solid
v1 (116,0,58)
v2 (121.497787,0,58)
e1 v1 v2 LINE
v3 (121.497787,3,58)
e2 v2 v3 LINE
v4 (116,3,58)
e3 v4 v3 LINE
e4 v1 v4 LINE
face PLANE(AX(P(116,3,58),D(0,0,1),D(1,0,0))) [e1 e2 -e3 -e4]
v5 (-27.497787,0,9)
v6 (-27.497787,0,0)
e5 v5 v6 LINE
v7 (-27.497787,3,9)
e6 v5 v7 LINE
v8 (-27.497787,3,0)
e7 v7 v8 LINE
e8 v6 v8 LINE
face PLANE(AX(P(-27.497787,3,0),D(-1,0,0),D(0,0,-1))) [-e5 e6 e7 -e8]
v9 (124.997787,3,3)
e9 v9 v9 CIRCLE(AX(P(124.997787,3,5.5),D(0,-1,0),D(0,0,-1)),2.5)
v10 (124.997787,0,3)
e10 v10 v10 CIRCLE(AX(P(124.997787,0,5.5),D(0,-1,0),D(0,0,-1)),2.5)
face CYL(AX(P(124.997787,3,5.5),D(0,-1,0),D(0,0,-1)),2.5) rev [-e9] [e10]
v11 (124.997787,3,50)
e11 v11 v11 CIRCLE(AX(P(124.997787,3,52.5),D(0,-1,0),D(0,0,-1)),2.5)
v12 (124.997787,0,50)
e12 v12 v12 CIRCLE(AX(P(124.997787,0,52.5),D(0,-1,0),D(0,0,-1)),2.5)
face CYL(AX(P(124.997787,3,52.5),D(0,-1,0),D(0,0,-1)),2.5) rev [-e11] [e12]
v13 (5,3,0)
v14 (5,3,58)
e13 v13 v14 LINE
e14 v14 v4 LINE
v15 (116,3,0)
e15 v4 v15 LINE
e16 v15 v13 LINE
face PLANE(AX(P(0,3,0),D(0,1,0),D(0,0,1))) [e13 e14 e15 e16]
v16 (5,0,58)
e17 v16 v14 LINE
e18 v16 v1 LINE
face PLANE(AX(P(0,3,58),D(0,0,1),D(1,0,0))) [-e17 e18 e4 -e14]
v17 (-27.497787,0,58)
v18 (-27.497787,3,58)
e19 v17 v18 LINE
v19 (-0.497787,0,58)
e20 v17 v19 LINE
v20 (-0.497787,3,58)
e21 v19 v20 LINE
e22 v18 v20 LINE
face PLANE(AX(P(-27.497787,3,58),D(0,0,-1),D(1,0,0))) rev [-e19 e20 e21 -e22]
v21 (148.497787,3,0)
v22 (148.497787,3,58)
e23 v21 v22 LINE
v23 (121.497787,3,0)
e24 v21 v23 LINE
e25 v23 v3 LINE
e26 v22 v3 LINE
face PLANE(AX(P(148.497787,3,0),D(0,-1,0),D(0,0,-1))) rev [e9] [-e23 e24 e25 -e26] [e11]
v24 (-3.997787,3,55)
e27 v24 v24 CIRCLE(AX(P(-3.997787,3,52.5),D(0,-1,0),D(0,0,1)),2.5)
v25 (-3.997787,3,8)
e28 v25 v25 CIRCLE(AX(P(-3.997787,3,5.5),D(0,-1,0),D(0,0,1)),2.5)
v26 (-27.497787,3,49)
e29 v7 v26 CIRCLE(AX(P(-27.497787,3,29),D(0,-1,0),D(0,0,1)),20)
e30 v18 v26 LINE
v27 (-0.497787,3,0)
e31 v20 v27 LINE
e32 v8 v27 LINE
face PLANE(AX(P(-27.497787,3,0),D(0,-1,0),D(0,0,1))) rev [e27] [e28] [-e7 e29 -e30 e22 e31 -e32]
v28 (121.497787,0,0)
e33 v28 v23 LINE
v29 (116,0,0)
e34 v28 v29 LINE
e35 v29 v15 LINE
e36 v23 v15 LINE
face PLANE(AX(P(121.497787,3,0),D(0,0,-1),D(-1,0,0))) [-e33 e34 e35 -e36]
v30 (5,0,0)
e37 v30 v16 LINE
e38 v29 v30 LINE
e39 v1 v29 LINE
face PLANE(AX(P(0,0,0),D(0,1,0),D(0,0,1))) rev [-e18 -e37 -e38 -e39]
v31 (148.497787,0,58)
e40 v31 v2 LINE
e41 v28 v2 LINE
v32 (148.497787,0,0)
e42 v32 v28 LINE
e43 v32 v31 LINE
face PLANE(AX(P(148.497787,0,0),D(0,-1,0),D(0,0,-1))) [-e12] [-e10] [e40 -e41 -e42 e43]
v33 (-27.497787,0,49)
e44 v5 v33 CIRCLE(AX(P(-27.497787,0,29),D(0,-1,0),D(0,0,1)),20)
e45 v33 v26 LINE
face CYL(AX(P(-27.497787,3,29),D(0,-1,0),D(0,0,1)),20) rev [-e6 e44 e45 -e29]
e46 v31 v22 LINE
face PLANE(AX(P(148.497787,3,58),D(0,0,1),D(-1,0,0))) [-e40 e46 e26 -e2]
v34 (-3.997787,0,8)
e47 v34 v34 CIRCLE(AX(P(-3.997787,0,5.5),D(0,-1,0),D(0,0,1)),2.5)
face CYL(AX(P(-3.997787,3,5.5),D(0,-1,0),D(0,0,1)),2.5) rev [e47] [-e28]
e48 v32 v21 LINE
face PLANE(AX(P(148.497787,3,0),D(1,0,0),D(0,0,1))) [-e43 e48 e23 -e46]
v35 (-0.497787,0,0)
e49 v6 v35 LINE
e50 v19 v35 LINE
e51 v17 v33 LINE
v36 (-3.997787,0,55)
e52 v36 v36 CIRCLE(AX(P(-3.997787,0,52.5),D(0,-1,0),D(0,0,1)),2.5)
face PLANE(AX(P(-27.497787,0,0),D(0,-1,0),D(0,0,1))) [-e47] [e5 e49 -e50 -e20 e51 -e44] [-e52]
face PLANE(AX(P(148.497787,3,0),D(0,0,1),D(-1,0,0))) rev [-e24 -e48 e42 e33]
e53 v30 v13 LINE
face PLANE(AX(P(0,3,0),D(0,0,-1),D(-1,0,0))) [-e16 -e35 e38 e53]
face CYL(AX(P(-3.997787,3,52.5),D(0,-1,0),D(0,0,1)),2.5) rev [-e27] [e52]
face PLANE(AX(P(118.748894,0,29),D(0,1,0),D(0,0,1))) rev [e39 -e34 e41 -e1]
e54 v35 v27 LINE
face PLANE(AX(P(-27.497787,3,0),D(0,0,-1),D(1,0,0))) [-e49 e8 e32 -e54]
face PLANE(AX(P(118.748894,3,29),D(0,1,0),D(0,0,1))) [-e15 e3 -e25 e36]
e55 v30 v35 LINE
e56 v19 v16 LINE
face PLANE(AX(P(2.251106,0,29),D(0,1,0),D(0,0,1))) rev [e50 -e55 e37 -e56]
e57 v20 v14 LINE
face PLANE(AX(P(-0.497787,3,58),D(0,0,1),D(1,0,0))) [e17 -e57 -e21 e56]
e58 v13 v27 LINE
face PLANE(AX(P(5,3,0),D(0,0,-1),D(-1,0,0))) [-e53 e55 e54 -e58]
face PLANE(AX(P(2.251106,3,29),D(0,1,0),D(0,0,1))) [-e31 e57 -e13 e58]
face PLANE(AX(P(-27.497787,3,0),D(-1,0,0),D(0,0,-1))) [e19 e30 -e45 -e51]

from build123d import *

# Parameters (mm, degrees)
SKETCH1_W              = 121
SKETCH1_H              = 58
BOSS_EXTRUDE1_DEPTH    = 3
SKETCH2_W              = 3
SKETCH2_H              = 58
BOSS_EXTRUDE2_DEPTH    = 29
SKETCH3_R              = 2.5
CUT_EXTRUDE1_DEPTH     = 29
CUT_EXTRUDE2_START     = -29
SKETCH4_R              = 2.5
CUT_EXTRUDE2_DEPTH     = 29
CONVERT_SOLID1_DEPTH   = 58
CONVERT_SOLID1_2_DEPTH = 58
UNFOLD1_START          = 3
UNFOLD1_OUTLINE_W      = 121
UNFOLD1_OUTLINE_H      = 58
UNFOLD1_DEPTH          = 29
UNFOLD1_2_OUTLINE_R    = 2.5
UNFOLD1_2_DEPTH        = 3


# Read off the part's stored shape, not the designer's step: Convert-Solid1, Unfold1
with BuildPart() as part:
    # Sketch1 → Boss-Extrude1 (new body)
    with BuildSketch(Plane(origin=(0, 0, 0), x_dir=(1, 0, 0), z_dir=(0, 1, 0))):
        with Locations((60.5, -29)):
            Rectangle(SKETCH1_W, SKETCH1_H)
    extrude(amount=BOSS_EXTRUDE1_DEPTH)

    # Sketch2 → Boss-Extrude2 (add)
    with BuildSketch(Plane(origin=(0, 3, 0), x_dir=(1, 0, 0), z_dir=(0, 1, 0))):
        with Locations((1.5, -29)):
            Rectangle(SKETCH2_W, SKETCH2_H)
        with Locations((119.5, -29)):
            Rectangle(SKETCH2_W, SKETCH2_H)
    extrude(amount=BOSS_EXTRUDE2_DEPTH)

    # Sketch3 → Cut-Extrude1 (cut)
    with BuildSketch(Plane.ZY):
        with Locations((5.5, 8.5)):
            Circle(SKETCH3_R)
        with Locations((52.5, 8.5)):
            Circle(SKETCH3_R)
        with BuildLine():
            Line((9, 32), (49, 32))
            ThreePointArc((49, 32), (29, 12), (9, 32))
        make_face()
    extrude(amount=-CUT_EXTRUDE1_DEPTH, mode=Mode.SUBTRACT)

    # Sketch4 → Cut-Extrude2 (cut)
    with BuildSketch(Plane(origin=(121, 0, 0), x_dir=(0, 0, -1), z_dir=(1, 0, 0)).offset(CUT_EXTRUDE2_START)):
        with Locations(Location((-52.5, 8.5, 0), (0, 0, 180))):
            Circle(SKETCH4_R)
        with Locations(Location((-5.5, 8.5, 0), (0, 0, 180))):
            Circle(SKETCH4_R)
    extrude(amount=CUT_EXTRUDE2_DEPTH, mode=Mode.SUBTRACT)

    # Convert-Solid1 outline → Convert-Solid1 (cut)
    with BuildSketch(Plane.XY):
        with BuildLine():
            Line((0, 0), (5, 0))
            ThreePointArc((5, 0), (1.464466094, 1.464466094), (0, 5))
            Line((0, 5), (0, 0))
        make_face()
        with BuildLine():
            ThreePointArc((121, 5), (119.535533906, 1.464466094), (116, 0))
            Line((116, 0), (121, 0))
            Line((121, 0), (121, 5))
        make_face()
    extrude(amount=CONVERT_SOLID1_DEPTH, mode=Mode.SUBTRACT)

    # Convert-Solid1 2 outline → Convert-Solid1 2 (add)
    with BuildSketch(Plane.XY):
        with BuildLine():
            Line((3, 3), (5, 3))
            ThreePointArc((5, 3), (3.585786438, 3.585786438), (3, 5))
            Line((3, 5), (3, 3))
        make_face()
        with BuildLine():
            ThreePointArc((118, 5), (117.414213562, 3.585786438), (116, 3))
            Line((116, 3), (118, 3))
            Line((118, 3), (118, 5))
        make_face()
    extrude(amount=CONVERT_SOLID1_2_DEPTH)

    # Unfold1 outline → Unfold1 (cut)
    with BuildSketch(Plane(origin=(0, 0, 0), x_dir=(1, 0, 0), z_dir=(0, 1, 0)).offset(UNFOLD1_START)):
        with Locations((60.5, -29)):
            Rectangle(UNFOLD1_OUTLINE_W, UNFOLD1_OUTLINE_H)
    extrude(amount=UNFOLD1_DEPTH, mode=Mode.SUBTRACT)

    # Unfold1 2 outline → Unfold1 2 (add)
    with BuildSketch(Plane(origin=(0, 0, 0), x_dir=(1, 0, 0), z_dir=(0, 1, 0))):
        with BuildLine():
            Line((-27.497787144, 0), (-27.497787144, -9))
            ThreePointArc((-27.497787144, -9), (-7.497787144, -29), (-27.497787144, -49))
            Line((-27.497787144, -49), (-27.497787144, -58))
            Line((-27.497787144, -58), (148.497787144, -58))
            Line((148.497787144, -58), (148.497787144, 0))
            Line((148.497787144, 0), (-27.497787144, 0))
        make_face()
        with Locations((124.997787144, -5.5)):
            Circle(UNFOLD1_2_OUTLINE_R, mode=Mode.SUBTRACT)
        with Locations((124.997787144, -52.5)):
            Circle(UNFOLD1_2_OUTLINE_R, mode=Mode.SUBTRACT)
        with Locations((-3.997787144, -5.5)):
            Circle(UNFOLD1_2_OUTLINE_R, mode=Mode.SUBTRACT)
        with Locations((-3.997787144, -52.5)):
            Circle(UNFOLD1_2_OUTLINE_R, mode=Mode.SUBTRACT)
    extrude(amount=UNFOLD1_2_DEPTH)


solid = part.part
